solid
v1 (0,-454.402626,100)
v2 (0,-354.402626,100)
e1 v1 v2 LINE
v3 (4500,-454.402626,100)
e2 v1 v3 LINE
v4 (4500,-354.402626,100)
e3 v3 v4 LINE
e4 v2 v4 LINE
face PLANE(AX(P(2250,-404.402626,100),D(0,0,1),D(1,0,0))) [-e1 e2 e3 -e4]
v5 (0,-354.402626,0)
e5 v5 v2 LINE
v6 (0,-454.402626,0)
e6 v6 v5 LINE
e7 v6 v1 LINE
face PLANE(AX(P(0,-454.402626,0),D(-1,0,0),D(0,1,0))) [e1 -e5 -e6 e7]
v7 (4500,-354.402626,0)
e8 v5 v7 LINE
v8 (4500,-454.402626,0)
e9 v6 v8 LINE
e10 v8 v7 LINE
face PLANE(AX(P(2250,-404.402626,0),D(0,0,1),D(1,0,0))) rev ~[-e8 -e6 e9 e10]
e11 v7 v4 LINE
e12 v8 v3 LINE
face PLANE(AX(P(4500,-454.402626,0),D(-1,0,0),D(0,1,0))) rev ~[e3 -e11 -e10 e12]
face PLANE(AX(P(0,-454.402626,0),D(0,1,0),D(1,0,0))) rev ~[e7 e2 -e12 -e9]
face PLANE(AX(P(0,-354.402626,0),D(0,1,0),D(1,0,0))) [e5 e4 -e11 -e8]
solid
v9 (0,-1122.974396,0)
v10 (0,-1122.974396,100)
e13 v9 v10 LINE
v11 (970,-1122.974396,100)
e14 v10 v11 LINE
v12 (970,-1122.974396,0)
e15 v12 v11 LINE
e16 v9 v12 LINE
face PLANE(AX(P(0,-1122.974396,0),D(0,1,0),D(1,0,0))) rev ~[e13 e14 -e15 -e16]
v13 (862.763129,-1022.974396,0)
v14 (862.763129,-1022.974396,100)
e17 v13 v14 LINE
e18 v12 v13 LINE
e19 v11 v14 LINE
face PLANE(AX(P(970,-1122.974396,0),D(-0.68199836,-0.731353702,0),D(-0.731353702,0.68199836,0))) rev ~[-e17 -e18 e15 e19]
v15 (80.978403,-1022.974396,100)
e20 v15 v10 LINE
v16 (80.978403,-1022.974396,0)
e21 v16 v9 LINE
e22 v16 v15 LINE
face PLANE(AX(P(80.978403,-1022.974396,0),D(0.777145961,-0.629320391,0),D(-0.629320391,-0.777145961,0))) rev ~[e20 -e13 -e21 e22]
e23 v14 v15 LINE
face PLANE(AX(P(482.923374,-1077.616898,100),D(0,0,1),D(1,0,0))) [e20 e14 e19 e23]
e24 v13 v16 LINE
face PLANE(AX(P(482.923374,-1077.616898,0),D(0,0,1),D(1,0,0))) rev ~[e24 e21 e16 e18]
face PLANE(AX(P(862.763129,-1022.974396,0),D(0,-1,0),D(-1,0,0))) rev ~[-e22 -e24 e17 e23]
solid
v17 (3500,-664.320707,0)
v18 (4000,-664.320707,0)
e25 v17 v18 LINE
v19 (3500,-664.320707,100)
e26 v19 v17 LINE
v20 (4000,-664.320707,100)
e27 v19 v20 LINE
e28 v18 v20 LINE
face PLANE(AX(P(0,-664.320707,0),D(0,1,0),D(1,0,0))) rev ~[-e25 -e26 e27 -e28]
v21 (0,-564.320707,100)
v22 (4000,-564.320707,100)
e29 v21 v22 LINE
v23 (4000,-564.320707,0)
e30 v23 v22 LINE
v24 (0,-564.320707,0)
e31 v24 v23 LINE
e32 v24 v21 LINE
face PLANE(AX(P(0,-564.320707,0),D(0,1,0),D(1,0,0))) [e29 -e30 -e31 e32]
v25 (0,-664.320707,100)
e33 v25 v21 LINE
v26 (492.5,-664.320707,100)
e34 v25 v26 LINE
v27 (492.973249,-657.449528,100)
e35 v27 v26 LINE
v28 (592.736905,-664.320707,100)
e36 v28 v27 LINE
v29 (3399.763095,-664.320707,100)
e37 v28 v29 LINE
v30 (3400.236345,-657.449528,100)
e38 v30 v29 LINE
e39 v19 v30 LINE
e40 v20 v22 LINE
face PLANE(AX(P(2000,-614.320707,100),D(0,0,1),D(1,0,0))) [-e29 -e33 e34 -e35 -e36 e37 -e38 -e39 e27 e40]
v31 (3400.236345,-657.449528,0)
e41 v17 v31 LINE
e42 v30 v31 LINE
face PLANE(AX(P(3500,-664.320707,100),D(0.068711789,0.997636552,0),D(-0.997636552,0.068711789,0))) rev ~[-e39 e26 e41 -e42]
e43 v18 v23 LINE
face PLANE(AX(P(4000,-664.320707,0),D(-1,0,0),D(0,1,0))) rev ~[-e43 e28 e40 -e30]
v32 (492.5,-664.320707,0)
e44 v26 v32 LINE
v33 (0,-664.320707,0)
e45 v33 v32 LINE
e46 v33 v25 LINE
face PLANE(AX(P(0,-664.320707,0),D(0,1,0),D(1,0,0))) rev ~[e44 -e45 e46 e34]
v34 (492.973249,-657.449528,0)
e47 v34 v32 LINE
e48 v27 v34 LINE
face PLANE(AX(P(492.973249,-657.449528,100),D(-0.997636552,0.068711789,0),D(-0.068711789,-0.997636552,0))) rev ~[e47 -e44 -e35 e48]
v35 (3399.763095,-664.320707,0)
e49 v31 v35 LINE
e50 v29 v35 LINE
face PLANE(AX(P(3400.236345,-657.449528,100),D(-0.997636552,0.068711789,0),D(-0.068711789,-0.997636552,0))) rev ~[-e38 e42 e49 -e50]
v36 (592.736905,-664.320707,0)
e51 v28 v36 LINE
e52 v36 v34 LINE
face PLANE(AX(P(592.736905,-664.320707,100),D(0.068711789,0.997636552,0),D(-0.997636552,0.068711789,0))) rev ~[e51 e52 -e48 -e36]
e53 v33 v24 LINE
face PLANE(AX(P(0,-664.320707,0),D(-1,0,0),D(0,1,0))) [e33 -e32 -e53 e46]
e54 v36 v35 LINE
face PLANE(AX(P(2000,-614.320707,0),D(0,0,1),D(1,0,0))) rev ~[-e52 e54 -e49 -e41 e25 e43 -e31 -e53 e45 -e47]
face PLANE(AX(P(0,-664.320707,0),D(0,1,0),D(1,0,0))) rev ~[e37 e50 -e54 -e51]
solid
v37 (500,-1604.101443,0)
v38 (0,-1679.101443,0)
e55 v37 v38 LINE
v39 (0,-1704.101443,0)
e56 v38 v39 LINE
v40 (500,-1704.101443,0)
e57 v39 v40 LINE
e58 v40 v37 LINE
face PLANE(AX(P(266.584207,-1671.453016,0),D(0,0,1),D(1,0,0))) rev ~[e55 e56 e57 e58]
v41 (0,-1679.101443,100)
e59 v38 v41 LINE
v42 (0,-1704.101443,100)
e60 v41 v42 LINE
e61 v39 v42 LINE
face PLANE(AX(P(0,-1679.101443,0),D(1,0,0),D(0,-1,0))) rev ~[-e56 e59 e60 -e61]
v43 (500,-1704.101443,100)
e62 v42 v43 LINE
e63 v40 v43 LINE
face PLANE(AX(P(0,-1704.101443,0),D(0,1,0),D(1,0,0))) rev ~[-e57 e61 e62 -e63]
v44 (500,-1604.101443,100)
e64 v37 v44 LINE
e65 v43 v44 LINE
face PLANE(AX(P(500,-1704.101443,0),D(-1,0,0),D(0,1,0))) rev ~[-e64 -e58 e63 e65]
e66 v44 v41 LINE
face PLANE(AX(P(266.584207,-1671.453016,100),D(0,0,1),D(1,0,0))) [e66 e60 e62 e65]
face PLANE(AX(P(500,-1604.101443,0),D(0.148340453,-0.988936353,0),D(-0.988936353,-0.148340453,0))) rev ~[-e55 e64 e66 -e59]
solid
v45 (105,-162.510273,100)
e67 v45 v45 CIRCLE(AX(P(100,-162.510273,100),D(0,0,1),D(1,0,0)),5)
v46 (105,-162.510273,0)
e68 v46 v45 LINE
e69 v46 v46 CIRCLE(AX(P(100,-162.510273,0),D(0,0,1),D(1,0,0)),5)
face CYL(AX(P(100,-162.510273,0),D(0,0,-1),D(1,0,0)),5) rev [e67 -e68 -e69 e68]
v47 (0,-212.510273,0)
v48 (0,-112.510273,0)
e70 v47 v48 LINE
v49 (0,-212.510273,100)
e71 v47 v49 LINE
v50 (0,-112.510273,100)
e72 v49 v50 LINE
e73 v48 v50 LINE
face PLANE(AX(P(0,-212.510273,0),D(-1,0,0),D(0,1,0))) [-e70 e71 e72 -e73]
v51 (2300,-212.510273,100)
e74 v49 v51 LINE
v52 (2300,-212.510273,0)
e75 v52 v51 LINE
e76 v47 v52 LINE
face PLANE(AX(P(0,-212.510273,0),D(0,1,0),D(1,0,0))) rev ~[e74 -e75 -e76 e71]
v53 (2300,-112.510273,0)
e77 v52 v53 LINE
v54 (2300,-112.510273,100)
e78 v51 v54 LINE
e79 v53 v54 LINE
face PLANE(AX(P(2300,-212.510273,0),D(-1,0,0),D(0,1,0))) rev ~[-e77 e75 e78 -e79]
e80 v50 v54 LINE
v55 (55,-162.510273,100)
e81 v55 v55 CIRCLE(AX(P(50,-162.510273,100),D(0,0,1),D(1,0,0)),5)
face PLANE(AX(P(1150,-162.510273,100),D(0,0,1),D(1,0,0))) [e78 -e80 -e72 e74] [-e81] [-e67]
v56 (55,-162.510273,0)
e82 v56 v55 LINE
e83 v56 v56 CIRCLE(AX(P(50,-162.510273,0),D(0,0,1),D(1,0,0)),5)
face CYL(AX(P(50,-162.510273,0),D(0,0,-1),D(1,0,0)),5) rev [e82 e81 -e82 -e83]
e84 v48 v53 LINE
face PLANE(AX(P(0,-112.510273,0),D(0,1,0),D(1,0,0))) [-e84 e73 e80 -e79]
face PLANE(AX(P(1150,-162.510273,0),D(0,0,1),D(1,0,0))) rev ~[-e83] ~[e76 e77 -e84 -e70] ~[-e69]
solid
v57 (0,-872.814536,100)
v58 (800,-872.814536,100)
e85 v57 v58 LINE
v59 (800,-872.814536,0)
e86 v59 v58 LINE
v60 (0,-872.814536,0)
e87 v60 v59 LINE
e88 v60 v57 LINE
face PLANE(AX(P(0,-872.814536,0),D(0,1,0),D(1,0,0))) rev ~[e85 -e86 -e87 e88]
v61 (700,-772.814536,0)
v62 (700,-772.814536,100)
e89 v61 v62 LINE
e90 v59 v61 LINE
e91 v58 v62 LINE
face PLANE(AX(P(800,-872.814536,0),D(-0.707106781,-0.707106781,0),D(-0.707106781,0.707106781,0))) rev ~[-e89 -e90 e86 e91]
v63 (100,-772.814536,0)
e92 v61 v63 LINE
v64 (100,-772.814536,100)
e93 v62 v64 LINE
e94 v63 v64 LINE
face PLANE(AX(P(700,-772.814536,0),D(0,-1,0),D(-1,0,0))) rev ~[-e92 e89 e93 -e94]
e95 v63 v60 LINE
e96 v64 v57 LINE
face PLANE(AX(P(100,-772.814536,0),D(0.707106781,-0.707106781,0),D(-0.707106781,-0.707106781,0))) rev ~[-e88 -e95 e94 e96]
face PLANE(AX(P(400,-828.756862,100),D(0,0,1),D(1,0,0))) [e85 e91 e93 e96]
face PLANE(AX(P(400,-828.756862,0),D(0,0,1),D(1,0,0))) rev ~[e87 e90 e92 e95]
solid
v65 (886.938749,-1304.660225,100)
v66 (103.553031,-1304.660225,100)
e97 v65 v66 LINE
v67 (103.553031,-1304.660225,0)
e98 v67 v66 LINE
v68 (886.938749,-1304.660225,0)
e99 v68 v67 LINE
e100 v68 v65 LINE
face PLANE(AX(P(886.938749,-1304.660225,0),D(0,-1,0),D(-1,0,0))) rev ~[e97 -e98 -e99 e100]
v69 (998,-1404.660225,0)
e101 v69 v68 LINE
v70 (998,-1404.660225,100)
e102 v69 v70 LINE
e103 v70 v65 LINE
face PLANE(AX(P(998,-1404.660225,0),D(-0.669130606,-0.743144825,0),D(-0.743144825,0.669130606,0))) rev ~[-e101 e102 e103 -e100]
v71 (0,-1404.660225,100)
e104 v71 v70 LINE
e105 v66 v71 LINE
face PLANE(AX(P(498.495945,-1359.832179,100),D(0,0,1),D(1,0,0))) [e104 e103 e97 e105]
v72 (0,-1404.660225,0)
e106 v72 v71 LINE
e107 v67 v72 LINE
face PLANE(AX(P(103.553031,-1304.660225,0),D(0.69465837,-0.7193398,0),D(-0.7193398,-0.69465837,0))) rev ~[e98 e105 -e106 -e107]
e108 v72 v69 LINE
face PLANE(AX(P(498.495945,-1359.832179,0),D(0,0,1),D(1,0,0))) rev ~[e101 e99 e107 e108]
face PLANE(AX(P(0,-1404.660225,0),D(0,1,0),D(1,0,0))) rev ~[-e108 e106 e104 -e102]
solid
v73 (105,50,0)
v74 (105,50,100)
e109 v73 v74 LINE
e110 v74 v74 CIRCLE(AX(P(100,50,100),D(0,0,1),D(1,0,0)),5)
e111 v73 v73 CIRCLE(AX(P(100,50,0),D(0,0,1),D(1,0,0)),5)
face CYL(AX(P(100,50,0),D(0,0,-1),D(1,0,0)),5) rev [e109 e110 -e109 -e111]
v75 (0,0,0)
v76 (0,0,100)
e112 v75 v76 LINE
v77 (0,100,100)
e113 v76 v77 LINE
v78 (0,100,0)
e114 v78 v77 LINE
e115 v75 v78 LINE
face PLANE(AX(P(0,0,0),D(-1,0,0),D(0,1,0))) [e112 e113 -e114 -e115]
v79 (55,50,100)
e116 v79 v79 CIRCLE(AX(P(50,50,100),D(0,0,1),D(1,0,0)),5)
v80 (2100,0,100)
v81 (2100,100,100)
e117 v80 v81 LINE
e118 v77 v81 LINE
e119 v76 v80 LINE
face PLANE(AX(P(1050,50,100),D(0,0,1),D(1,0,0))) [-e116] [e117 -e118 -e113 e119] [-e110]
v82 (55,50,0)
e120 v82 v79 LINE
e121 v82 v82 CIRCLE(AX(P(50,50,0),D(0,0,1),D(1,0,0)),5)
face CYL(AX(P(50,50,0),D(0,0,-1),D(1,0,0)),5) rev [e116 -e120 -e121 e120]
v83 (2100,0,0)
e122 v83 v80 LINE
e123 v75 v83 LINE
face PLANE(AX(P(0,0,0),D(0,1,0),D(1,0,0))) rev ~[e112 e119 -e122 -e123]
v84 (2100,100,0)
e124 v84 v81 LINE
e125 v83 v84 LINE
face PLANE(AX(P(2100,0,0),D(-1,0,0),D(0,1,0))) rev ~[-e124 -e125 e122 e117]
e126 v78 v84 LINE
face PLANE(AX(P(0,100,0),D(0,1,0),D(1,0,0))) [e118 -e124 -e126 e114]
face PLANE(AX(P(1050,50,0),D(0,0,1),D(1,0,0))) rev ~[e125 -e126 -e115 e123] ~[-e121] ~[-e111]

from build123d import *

# Parameters (mm, degrees)
F0_W     = 2100
F0_H     = 100
F0_R     = 5
F1_DEPTH = 100
F0_W_2   = 2300
F0_W_3   = 4500
F0_W_4   = 4000
F2_R     = 5
F3_DEPTH = 50
F5_DEPTH = 100


# Not quite as in the source:
# - a feature names something its author has since deleted; it is built from what else it names


with BuildPart() as f1:
    # F0 (on Top) → F1 (new body)
    with BuildSketch(Plane.XY):
        with Locations((1050, 50)):
            Rectangle(F0_W, F0_H)
        with Locations((50, 50)):
            Circle(F0_R, mode=Mode.SUBTRACT)
        with Locations((100, 50)):
            Circle(F0_R, mode=Mode.SUBTRACT)
    extrude(amount=F1_DEPTH)

    # F2 (on face) → F3 (cut)
    with BuildSketch(Plane(origin=(0, -354.4026255608, 0), x_dir=(-1, 0, 0), z_dir=(0, 1, 0))):
        with Locations((100, 50)):
            Circle(F2_R)
        with Locations((50, 50)):
            Circle(F2_R)
    extrude(amount=-F3_DEPTH, mode=Mode.SUBTRACT)


with BuildPart() as f1b:
    # F0 (on Top) → F1, piece 2 (new body)
    with BuildSketch(Plane.XY):
        with Locations((1150, -162.5102728605)):
            Rectangle(F0_W_2, F0_H)
        with Locations((50, -162.5102728605)):
            Circle(F0_R, mode=Mode.SUBTRACT)
        with Locations((100, -162.5102728605)):
            Circle(F0_R, mode=Mode.SUBTRACT)
    extrude(amount=F1_DEPTH)


with BuildPart() as f1c:
    # F0 (on Top) → F1, piece 3 (new body)
    with BuildSketch(Plane.XY):
        with Locations((2250, -404.4026255608)):
            Rectangle(F0_W_3, F0_H)
    extrude(amount=F1_DEPTH)


with BuildPart() as f1d:
    # F0 (on Top) → F1, piece 4 (new body)
    with BuildSketch(Plane.XY):
        with Locations((2000, -614.3207073212)):
            Rectangle(F0_W_4, F0_H)
    extrude(amount=F1_DEPTH)

    # F4 (on face) → F5 (cut)
    with BuildSketch(Plane.XY.offset(100)):
        Polygon((3500, -664.3207073212), (3400.2363447921, -657.4495284155), (3399.763095296, -664.3207073212), align=None)
        Polygon((492.5, -664.3207073212), (592.736904704, -664.3207073212), (492.9732494961, -657.4495284155), align=None)
    extrude(amount=-F5_DEPTH, mode=Mode.SUBTRACT)


with BuildPart() as f1e:
    # F0 (on Top) → F1, piece 5 (new body)
    with BuildSketch(Plane.XY):
        Polygon((100, -772.8145360947), (0, -872.8145360947), (800, -872.8145360947), (700, -772.8145360947), align=None)
    extrude(amount=F1_DEPTH)


with BuildPart() as f1f:
    # F0 (on Top) → F1, piece 6 (new body)
    with BuildSketch(Plane.XY):
        Polygon((80.9784033195, -1022.974395752), (0, -1122.974395752), (970, -1122.974395752), (862.7631289975, -1022.974395752), align=None)
    extrude(amount=F1_DEPTH)


with BuildPart() as f1g:
    # F0 (on Top) → F1, piece 7 (new body)
    with BuildSketch(Plane.XY):
        Polygon((103.5530313791, -1304.6602249146), (0, -1404.6602249146), (998, -1404.6602249146), (886.9387485171, -1304.6602249146), align=None)
    extrude(amount=F1_DEPTH)


with BuildPart() as f1h:
    # F0 (on Top) → F1, piece 8 (new body)
    with BuildSketch(Plane.XY):
        Polygon((0, -1679.1014432907), (0, -1704.1014432907), (500, -1704.1014432907), (500, -1604.1014432907), align=None)
    extrude(amount=F1_DEPTH)


solid = Compound([f1.part, f1b.part, f1c.part, f1d.part, f1e.part, f1f.part, f1g.part, f1h.part])
